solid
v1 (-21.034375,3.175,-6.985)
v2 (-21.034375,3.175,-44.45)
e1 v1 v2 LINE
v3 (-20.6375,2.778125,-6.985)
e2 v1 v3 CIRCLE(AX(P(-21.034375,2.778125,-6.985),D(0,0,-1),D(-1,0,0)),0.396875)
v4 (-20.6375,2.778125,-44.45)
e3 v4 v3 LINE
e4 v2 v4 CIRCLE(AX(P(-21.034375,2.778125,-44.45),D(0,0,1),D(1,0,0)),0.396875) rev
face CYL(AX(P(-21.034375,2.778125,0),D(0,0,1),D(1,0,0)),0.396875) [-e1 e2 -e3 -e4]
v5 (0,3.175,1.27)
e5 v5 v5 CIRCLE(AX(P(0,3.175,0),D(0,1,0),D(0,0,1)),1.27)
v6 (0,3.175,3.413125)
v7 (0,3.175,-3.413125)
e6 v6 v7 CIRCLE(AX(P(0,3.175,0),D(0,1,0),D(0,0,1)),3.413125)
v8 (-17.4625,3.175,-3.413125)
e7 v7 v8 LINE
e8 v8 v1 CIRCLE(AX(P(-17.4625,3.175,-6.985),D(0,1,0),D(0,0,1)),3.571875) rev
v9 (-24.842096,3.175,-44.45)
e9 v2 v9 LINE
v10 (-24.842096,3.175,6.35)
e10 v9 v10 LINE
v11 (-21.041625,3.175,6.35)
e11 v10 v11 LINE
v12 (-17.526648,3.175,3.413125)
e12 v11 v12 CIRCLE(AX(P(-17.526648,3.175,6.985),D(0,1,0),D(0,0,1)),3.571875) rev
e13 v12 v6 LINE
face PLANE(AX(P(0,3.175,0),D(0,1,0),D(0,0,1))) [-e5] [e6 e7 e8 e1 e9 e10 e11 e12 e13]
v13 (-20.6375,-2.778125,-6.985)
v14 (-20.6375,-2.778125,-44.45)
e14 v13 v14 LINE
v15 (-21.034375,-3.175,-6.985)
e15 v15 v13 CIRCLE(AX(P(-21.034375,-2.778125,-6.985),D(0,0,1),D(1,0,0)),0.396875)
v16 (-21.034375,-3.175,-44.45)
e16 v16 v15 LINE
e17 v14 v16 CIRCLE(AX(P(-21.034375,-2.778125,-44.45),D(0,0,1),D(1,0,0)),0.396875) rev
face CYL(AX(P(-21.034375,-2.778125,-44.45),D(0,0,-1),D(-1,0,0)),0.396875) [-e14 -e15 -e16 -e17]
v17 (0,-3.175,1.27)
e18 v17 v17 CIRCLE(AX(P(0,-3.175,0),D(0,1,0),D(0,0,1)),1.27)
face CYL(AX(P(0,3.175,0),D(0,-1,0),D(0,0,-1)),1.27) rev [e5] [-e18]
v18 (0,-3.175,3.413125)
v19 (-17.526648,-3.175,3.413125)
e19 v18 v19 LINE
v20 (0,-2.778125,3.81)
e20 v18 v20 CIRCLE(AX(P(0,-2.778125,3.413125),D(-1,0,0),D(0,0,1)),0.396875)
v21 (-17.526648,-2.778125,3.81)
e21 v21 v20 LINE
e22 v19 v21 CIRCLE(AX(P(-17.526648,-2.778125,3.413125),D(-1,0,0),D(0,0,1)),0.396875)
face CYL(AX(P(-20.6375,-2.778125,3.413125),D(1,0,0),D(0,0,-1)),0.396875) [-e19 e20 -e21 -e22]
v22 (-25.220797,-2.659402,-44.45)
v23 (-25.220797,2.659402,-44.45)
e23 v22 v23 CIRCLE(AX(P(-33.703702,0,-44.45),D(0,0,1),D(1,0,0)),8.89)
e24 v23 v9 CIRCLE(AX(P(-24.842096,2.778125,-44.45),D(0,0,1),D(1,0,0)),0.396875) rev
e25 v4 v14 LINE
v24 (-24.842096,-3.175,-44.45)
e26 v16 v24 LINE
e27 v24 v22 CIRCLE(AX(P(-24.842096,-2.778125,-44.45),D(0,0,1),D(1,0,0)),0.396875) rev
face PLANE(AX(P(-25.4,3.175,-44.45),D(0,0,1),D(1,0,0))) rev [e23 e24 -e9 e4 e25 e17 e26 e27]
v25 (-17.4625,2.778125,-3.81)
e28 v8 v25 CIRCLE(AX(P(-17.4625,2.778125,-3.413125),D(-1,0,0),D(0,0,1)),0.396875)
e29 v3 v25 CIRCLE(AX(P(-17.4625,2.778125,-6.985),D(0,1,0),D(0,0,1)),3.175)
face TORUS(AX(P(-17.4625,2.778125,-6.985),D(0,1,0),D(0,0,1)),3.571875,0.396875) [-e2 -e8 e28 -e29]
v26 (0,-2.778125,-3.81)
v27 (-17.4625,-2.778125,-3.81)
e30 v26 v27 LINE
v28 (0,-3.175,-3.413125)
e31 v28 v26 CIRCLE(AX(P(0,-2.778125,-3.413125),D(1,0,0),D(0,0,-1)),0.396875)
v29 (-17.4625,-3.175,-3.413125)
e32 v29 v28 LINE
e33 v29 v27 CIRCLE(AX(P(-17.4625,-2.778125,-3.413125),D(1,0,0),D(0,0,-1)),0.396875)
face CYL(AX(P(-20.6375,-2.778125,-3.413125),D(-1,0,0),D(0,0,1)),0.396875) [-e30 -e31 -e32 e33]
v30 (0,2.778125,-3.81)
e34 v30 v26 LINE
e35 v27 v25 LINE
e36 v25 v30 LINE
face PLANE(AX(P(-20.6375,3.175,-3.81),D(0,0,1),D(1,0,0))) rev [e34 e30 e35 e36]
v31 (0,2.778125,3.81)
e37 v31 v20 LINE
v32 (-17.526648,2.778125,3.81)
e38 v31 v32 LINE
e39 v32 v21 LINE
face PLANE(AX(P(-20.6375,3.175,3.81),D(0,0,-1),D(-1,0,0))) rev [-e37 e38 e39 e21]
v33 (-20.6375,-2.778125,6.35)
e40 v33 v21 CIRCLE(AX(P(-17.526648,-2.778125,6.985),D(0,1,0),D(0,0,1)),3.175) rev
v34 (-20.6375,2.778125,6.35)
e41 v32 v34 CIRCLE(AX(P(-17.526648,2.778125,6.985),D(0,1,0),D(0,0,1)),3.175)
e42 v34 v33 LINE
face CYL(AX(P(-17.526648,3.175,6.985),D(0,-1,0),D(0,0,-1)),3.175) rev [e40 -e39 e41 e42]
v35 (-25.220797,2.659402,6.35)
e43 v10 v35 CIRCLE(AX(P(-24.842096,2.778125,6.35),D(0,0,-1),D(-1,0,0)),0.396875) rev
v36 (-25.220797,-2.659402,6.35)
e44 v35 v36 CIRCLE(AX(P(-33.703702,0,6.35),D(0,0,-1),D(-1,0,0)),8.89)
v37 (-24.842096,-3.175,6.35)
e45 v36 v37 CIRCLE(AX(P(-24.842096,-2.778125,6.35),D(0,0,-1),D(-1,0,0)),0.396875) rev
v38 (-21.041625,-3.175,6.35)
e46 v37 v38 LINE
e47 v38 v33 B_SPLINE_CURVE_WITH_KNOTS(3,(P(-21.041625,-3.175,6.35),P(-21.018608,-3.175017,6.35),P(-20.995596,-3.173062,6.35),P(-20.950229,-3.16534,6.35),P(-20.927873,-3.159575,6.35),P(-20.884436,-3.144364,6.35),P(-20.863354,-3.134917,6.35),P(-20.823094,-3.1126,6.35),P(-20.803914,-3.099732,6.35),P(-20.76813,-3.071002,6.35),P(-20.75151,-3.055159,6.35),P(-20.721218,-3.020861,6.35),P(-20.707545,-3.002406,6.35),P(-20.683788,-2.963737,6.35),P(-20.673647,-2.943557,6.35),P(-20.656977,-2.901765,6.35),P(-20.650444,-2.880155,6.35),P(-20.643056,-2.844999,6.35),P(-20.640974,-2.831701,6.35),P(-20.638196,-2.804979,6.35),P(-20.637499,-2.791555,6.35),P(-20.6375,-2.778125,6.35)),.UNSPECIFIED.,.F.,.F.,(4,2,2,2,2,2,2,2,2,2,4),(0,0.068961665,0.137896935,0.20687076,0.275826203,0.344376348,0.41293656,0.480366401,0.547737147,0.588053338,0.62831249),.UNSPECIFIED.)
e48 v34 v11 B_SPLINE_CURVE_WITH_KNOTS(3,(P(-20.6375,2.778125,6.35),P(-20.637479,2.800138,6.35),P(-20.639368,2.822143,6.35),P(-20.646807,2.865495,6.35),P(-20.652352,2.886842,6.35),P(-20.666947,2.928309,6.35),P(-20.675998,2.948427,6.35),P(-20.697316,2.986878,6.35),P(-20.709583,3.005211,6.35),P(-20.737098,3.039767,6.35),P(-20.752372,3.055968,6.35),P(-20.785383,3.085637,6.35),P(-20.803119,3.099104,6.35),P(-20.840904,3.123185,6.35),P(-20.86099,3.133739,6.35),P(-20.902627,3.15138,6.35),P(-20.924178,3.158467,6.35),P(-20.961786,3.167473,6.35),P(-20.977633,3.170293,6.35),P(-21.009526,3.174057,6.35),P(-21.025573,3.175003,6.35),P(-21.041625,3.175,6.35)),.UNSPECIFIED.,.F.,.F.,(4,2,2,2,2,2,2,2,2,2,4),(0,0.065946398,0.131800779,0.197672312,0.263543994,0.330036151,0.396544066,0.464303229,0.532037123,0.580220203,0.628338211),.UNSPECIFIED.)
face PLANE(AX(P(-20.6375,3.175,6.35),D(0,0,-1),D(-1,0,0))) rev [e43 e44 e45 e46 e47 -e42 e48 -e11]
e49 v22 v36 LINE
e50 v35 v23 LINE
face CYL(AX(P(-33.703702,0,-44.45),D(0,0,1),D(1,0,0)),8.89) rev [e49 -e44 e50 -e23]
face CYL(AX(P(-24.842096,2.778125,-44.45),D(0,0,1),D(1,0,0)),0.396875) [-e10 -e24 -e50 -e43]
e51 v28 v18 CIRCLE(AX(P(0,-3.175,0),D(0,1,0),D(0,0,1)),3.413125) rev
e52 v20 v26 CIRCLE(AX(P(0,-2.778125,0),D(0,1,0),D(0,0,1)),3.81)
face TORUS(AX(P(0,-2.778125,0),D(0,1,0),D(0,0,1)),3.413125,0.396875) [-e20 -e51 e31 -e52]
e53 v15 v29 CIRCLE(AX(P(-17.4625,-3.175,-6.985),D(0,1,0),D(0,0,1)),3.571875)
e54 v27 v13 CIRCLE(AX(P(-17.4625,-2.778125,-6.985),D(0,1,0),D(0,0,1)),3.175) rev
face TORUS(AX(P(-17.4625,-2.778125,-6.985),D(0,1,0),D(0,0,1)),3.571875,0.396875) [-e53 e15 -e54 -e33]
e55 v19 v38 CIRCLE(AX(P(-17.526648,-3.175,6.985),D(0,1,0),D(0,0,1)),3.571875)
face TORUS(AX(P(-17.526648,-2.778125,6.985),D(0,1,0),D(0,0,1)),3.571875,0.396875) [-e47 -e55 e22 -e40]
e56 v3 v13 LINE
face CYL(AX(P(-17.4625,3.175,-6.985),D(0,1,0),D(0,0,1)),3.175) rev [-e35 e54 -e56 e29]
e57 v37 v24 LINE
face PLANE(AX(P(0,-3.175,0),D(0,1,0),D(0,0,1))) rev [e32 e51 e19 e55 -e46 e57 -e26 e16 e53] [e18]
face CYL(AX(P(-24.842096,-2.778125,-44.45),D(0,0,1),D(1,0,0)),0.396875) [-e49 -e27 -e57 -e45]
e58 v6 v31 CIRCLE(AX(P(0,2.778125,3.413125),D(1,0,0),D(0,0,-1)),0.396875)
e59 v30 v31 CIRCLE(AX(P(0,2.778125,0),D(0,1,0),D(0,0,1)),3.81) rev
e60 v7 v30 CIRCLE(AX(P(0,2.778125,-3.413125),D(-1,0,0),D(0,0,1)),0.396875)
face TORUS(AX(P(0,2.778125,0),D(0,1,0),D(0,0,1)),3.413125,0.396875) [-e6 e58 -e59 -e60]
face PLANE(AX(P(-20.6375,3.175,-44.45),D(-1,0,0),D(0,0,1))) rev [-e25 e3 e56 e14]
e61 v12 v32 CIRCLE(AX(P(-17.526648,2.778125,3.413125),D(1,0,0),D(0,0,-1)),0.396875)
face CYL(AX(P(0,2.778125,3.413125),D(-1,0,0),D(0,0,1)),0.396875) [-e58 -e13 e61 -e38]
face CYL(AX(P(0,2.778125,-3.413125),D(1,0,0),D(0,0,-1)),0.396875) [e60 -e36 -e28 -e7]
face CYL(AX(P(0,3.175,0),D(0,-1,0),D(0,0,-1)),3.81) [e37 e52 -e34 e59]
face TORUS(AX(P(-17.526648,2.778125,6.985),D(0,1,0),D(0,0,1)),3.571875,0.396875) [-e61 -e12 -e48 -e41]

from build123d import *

# Parameters (mm, degrees)
SKETCH1_R               = 1.27
BOSS_EXTRUDE1_DEPTH     = 3.175
FILLET1_R               = 3.175
CUT_EXTRUDE1_DEPTH      = 57.884801353
CUT_EXTRUDE1_DEPTH_BACK = 57.884801353
SKETCH3_R               = 8.89
FILLET2_R               = 0.396875


with BuildPart() as part:
    # Sketch1 → Boss-Extrude1 (new, symmetric)
    with BuildSketch(Plane(origin=(0, 0, 0), x_dir=(1, 0, 0), z_dir=(0, 1, 0))):
        with BuildLine():
            Line((-20.6375, -3.81), (-20.6375, -6.35))
            Line((-20.6375, -6.35), (-25.4, -6.35))
            Line((-25.4, -6.35), (-25.4, 44.45))
            Line((-25.4, 44.45), (-20.6375, 44.45))
            Line((-20.6375, 44.45), (-20.6375, 3.81))
            Line((-20.6375, 3.81), (0, 3.81))
            ThreePointArc((0, 3.81), (3.81, 0), (0, -3.81))
            Line((0, -3.81), (-20.6375, -3.81))
        make_face()
        with Locations(Location((0, 0, 0), (0, 0, 270))):
            Circle(SKETCH1_R, mode=Mode.SUBTRACT)
    extrude(amount=BOSS_EXTRUDE1_DEPTH, both=True)

    # Fillet1
    # the kernel refuses this fillet: 3.175 mm, written as the material it adds along each edge
    with BuildSketch(Plane(origin=(-20.6375, 3.175, 3.81), x_dir=(1, 0, 0), z_dir=(0, -1, 0))) as fillet1_piece_1:
        with BuildLine():
            CenterArc((3.110851973, 3.175), FILLET1_R, 191.536959033, 78.463040967)
            Line((0, 2.54), (-0.062217039, 2.5273))
            ThreePointArc((-0.062217039, 2.5273), (-0.0635, 1.27), (-0.0635, 0))
            Line((-0.0635, 0), (0, -0.0635))
            Line((0, -0.0635), (3.110851973, -0.0635))
            Line((3.110851973, -0.0635), (3.110851973, 0))
        make_face()
    extrude(amount=6.35)
    with BuildSketch(Plane(origin=(-20.6375, -3.175, -3.81), x_dir=(1, 0, 0), z_dir=(0, 1, 0))) as fillet1_piece_2:
        with BuildLine():
            CenterArc((FILLET1_R, FILLET1_R), FILLET1_R, 180, 90)
            Line((0, FILLET1_R), (-FILLET1_R * 0.02, FILLET1_R))
            Line((-FILLET1_R * 0.02, FILLET1_R), (-FILLET1_R * 0.02, -FILLET1_R * 0.02))
            Line((-FILLET1_R * 0.02, -FILLET1_R * 0.02), (FILLET1_R, -FILLET1_R * 0.02))
            Line((FILLET1_R, -FILLET1_R * 0.02), (FILLET1_R, 0))
        make_face()
    extrude(amount=6.35)

    # Sketch3 → Cut-Extrude1 (cut, two sides: drawn at the far end of the back side and taken through both)
    with BuildSketch(Plane.XY.offset(6.35).offset(-CUT_EXTRUDE1_DEPTH_BACK)):
        with Locations((-33.703702487, 0)):
            Circle(SKETCH3_R)
    extrude(amount=CUT_EXTRUDE1_DEPTH + CUT_EXTRUDE1_DEPTH_BACK, mode=Mode.SUBTRACT)

    # Fillet2
    fillet2_edges = [part.edges().sort_by_distance(p)[0] for p in [
        (-8.73125, -3.175, -3.81),
        (3.81, -3.175, 0),
        (-25.4, 3.175, -19.05),
        (-8.763324013, -3.175, 3.81),
        (-8.763324013, 3.175, 3.81),
        (-20.6375, -3.175, -25.7175),
        (-20.6375, 3.175, -25.7175),
        (-19.534694341, -3.175, 4.525655575),
        (-19.534694341, 3.175, 4.525655575),
        (-19.70756403, -3.175, -4.73993597),
        (-19.70756403, 3.175, -4.73993597),
        (3.81, 3.175, 0),
        (-8.73125, 3.175, -3.81),
        (-25.4, -3.175, -19.05),
    ]]
    fillet(fillet2_edges, radius=FILLET2_R)


solid = part.part
